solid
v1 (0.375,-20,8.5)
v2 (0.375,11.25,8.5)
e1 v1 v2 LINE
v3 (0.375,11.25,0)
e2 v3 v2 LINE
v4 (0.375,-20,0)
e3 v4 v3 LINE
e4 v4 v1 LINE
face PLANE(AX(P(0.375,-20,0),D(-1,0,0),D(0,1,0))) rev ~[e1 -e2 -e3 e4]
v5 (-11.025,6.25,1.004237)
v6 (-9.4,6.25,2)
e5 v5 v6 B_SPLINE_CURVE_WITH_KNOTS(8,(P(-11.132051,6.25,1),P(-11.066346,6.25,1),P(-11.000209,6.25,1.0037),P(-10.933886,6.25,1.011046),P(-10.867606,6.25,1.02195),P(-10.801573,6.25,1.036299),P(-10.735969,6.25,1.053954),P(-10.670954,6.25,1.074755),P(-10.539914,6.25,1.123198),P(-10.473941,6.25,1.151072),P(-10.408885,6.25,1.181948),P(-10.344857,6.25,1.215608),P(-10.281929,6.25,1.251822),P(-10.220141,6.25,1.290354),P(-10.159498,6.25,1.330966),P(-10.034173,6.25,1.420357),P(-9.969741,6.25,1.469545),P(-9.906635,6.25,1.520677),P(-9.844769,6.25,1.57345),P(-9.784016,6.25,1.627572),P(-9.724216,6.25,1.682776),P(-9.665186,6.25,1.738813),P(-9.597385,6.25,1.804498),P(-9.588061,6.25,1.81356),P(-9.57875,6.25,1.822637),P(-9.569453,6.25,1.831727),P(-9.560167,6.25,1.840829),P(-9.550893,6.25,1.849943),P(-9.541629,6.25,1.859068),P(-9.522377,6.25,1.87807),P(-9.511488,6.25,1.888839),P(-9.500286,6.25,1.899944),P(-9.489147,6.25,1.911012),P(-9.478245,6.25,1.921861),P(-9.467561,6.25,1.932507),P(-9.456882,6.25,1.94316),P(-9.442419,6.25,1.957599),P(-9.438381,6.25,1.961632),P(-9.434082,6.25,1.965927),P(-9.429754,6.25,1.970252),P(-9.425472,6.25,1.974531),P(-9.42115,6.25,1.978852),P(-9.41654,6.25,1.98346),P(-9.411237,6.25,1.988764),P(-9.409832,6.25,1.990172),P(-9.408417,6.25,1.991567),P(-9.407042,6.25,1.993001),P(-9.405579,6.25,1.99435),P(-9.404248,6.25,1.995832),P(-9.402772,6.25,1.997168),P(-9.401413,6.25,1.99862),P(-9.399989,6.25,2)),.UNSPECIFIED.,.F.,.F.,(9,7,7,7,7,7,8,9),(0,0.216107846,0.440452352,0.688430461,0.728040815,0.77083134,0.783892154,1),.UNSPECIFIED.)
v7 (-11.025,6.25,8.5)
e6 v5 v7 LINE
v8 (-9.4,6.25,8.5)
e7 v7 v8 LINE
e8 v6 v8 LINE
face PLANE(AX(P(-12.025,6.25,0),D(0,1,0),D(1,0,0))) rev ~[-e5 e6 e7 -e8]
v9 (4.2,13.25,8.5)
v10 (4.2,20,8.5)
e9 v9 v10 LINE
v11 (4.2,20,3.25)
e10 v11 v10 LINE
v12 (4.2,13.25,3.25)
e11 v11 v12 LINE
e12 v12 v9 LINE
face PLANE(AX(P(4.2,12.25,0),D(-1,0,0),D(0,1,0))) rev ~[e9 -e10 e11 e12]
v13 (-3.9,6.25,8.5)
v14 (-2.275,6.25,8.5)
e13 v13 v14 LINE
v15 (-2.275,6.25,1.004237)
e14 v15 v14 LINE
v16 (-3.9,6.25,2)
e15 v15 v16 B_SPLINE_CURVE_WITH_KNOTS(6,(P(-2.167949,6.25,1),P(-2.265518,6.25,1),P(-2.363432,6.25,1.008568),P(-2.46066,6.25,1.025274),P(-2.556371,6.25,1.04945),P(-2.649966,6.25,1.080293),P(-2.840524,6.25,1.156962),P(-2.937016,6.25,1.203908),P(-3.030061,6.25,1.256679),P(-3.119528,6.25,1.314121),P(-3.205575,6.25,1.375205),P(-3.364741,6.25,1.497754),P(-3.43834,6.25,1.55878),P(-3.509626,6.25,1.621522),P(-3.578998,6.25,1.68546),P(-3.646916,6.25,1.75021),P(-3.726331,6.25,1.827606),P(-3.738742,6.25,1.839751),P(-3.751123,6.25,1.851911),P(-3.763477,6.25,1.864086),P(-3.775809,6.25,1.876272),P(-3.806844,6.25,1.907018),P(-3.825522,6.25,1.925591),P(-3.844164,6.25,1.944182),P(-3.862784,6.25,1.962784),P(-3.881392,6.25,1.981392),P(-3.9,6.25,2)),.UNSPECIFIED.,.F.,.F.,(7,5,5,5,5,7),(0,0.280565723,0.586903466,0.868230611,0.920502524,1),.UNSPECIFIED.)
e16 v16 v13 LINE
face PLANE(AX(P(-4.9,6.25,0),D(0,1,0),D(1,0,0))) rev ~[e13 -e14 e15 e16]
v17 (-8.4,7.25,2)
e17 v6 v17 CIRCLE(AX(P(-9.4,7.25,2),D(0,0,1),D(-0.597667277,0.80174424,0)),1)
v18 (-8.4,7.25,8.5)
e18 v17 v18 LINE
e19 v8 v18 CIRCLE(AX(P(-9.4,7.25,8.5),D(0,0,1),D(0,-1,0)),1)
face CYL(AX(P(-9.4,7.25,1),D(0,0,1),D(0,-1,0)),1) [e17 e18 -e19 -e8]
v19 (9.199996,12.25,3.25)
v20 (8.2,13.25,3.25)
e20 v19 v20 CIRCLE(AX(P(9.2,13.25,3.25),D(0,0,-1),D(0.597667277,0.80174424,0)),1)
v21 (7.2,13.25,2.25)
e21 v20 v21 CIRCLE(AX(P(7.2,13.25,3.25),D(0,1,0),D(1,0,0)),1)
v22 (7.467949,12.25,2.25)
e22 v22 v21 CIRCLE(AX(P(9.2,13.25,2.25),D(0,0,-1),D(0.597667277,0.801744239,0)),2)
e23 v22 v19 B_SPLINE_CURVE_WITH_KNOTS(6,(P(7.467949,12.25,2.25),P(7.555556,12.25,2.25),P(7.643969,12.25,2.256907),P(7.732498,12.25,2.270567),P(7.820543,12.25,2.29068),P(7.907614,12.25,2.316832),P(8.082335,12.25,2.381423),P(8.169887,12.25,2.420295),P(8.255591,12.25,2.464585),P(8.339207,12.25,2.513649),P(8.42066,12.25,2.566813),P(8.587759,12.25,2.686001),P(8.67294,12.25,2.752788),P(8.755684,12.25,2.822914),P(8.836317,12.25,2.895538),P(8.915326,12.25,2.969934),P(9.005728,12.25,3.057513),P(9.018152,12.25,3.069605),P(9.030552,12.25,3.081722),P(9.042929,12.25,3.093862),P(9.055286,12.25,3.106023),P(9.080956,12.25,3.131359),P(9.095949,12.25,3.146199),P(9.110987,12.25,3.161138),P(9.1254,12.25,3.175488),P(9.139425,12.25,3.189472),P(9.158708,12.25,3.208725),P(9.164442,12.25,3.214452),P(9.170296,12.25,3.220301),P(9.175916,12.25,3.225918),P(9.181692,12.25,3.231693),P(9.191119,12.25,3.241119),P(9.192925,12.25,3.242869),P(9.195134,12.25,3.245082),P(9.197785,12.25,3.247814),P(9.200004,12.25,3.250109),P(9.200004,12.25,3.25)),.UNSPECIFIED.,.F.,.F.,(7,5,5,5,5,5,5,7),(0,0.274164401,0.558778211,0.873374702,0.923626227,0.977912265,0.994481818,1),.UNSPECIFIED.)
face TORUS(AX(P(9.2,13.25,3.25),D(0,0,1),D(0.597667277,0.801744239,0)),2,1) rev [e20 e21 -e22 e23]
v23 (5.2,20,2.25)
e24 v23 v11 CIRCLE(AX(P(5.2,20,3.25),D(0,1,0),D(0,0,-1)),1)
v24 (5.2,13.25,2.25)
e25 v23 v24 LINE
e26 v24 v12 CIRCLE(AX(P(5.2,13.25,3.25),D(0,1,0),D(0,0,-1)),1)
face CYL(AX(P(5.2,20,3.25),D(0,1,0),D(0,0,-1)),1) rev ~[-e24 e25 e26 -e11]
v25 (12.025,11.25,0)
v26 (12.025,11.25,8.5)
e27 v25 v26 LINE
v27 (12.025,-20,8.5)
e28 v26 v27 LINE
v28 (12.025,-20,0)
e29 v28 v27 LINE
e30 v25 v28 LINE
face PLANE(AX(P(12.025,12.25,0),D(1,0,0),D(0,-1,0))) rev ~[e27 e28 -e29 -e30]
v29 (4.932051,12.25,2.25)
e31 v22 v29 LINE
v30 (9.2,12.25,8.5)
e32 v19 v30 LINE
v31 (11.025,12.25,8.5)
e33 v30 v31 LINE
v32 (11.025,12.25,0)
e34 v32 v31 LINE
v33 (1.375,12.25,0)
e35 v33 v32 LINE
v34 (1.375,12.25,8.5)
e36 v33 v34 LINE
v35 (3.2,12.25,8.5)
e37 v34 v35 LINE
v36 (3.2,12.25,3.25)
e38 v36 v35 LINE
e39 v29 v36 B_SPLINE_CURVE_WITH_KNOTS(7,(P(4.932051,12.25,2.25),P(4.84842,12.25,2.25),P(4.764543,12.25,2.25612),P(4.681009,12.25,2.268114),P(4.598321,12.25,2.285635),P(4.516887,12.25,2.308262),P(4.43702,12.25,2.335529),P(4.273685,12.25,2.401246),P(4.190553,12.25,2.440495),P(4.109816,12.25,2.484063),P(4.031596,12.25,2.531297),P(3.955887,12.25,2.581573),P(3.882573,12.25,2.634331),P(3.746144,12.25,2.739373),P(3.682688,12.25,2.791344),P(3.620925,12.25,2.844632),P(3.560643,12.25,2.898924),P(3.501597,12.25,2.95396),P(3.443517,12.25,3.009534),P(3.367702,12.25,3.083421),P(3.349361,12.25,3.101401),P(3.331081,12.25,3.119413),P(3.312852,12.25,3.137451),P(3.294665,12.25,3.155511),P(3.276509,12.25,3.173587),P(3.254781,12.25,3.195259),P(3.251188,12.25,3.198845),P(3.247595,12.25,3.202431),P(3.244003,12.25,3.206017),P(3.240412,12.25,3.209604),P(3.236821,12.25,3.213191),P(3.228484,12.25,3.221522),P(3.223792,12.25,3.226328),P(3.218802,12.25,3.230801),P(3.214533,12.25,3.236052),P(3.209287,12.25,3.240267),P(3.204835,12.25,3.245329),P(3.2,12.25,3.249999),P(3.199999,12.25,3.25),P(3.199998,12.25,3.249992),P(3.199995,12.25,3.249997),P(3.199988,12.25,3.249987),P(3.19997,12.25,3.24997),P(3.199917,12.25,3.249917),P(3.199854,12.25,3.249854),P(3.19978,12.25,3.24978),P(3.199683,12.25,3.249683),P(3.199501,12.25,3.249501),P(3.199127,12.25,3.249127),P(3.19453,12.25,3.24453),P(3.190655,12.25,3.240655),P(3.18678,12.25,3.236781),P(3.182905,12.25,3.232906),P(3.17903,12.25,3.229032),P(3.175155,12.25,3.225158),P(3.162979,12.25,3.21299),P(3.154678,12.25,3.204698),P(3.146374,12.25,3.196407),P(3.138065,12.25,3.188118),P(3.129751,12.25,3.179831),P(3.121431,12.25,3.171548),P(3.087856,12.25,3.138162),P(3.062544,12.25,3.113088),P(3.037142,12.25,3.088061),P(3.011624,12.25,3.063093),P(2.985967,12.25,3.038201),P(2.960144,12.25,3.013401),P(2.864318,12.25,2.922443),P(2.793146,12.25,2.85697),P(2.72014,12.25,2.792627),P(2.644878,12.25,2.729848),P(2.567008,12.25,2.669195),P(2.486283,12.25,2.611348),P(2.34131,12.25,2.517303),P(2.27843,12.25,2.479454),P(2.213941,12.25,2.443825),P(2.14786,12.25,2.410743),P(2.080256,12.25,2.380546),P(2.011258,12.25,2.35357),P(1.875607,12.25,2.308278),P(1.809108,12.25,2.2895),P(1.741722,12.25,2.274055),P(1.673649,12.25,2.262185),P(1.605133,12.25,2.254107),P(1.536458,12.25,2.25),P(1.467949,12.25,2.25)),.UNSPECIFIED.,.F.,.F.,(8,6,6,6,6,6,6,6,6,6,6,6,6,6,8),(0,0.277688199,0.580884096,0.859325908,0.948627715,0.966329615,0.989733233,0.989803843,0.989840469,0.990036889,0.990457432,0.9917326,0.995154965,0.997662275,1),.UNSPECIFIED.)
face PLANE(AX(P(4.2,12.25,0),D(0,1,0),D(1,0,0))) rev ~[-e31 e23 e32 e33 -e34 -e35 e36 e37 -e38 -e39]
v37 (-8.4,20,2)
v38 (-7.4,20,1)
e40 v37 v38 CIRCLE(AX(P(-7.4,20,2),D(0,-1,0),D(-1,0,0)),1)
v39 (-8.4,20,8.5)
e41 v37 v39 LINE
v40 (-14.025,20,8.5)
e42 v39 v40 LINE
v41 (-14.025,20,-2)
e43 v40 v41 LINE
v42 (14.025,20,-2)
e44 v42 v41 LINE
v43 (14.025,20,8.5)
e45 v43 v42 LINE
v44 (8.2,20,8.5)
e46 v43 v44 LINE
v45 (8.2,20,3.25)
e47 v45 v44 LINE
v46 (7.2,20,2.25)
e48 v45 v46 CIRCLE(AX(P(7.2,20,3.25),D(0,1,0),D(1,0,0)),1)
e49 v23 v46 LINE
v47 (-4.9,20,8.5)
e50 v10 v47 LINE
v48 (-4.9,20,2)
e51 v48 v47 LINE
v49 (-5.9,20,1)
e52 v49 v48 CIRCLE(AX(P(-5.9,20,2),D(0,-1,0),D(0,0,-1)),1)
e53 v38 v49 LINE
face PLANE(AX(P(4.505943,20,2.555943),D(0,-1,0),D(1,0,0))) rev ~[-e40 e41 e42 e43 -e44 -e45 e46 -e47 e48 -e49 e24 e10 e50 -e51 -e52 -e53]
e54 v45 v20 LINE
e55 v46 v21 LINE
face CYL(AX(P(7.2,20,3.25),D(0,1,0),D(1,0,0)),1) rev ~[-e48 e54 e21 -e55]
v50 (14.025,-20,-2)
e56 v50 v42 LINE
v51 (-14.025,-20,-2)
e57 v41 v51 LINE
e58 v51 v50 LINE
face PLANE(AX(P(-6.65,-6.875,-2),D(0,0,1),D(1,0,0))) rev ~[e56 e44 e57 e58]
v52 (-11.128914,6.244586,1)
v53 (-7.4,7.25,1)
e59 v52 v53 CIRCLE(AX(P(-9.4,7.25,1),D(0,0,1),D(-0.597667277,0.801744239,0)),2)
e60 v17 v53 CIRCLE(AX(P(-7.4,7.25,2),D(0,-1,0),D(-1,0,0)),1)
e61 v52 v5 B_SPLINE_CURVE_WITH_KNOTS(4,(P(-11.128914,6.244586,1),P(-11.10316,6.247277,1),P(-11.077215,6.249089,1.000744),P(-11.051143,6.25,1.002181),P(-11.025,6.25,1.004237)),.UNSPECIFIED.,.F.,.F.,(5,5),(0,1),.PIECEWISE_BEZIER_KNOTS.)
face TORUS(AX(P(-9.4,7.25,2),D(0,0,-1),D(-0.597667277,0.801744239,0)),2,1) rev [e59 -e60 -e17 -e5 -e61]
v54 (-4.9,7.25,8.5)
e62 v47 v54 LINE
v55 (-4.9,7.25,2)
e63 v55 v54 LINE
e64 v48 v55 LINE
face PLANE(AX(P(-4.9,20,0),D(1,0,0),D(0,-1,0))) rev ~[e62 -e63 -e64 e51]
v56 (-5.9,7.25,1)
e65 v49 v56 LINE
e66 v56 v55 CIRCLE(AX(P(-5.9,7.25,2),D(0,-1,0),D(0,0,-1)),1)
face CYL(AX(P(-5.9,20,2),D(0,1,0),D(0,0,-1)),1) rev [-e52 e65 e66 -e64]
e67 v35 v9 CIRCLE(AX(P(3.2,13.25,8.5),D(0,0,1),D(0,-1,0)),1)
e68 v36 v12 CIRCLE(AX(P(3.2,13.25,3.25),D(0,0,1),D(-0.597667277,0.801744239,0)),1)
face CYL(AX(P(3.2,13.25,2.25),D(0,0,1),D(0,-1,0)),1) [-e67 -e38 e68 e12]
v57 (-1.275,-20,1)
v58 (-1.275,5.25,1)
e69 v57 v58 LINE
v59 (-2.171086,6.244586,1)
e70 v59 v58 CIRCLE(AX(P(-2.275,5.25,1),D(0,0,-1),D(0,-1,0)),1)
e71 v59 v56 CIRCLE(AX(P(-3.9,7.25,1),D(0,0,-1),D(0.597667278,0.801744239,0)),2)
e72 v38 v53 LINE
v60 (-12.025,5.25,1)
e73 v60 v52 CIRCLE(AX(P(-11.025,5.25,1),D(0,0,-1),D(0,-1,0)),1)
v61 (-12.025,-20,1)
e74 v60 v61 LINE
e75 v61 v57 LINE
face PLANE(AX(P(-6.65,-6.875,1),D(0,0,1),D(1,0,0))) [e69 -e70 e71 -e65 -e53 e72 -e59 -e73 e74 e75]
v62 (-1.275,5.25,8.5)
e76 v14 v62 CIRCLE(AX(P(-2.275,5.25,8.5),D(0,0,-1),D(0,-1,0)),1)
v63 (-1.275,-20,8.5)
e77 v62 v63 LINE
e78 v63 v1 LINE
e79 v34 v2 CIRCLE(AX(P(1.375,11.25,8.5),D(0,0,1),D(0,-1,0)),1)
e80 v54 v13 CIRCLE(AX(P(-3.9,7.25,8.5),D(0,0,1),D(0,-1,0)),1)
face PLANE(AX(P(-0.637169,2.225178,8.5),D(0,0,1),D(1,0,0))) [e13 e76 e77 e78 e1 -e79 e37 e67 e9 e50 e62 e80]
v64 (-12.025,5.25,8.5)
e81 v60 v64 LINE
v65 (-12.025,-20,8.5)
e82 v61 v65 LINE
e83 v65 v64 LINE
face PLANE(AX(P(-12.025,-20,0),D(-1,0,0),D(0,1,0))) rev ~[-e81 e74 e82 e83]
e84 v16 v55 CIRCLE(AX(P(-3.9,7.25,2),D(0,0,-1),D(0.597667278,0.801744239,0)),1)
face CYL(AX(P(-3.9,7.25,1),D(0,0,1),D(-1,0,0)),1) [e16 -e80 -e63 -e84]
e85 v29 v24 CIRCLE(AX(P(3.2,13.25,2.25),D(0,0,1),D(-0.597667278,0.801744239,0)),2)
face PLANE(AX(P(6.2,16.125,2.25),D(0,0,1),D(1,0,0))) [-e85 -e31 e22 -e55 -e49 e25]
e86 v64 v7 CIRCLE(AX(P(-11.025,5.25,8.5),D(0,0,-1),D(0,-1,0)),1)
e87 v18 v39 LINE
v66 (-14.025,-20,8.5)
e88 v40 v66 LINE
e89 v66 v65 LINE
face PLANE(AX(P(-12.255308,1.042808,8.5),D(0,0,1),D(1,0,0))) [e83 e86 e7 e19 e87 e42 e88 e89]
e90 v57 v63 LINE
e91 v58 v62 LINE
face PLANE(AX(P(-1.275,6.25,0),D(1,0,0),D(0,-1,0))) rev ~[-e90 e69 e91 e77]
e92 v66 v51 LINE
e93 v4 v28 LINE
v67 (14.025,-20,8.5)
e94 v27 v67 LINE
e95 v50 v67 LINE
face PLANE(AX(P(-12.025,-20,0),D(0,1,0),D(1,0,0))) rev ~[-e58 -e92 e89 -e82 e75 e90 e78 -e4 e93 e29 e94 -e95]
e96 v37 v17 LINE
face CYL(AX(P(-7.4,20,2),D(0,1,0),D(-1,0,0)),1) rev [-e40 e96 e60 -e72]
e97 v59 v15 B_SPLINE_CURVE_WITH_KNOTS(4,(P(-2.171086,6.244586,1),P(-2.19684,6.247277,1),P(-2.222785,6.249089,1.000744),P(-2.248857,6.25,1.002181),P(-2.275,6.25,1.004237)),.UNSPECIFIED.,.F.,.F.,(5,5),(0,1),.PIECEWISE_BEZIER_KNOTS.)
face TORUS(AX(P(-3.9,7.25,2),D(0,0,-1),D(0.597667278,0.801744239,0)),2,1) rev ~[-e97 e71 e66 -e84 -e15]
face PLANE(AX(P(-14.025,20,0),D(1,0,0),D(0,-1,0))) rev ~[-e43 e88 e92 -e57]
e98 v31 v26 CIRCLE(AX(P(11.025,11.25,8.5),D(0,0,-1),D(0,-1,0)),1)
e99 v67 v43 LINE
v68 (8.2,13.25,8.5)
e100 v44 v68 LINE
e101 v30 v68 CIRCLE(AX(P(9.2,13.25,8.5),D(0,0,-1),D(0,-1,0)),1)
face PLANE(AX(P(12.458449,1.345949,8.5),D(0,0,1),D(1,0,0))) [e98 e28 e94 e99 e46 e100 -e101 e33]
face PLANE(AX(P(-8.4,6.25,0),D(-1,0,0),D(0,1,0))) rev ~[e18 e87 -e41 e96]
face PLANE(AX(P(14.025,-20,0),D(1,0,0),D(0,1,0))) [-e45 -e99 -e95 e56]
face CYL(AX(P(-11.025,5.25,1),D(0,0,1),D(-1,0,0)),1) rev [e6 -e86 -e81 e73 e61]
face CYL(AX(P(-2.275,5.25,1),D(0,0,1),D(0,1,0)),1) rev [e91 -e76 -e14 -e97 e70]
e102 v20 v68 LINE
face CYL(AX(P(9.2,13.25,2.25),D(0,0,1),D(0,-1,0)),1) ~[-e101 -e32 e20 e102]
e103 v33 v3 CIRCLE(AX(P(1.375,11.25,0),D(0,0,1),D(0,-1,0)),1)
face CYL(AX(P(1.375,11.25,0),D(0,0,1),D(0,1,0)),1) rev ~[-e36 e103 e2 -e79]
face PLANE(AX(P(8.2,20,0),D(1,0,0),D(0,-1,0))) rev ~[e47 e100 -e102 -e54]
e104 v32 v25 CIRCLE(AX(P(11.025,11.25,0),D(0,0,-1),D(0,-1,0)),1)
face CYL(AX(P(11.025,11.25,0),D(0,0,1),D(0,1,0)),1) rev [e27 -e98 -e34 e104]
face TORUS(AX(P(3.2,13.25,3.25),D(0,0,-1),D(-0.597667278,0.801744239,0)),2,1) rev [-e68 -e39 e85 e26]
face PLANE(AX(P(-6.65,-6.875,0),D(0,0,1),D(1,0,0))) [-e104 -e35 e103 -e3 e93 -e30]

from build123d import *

# Parameters (mm, degrees)
F0_W         = 3.5
F0_H         = 13.75
F0_W_2       = 4
F0_H_2       = 7.75
F1_DEPTH     = 2
F2_DEPTH     = 8.5
F3_DEPTH     = 1
F4_DEPTH     = 2.25
F5_R         = 1
F6_T1_DEPTH  = 12.75
F6_T3_DEPTH  = 6.75
F6_T6_ANGLE  = 233.2969892374
F6_T8_ANGLE  = 233.2969892374
F6_T12_ANGLE = 233.2969892374
F6_T17_ANGLE = 233.2969892374


# Not quite as in the source:
# - a fillet or chamfer that OpenCascade refuses, or shapes differently, is made with other operations: its cross-section is extruded or revolved along the edge and cut away or added


with BuildPart() as f1:
    # F0 (on Top) → F1 (new body)
    with BuildSketch(Plane.XY):
        Polygon((-12.025, -20), (-1.275, -20), (-1.275, 6.25), (-4.9, 6.25), (-8.4, 6.25), (-12.025, 6.25), align=None)
        Polygon((-14.025, -20), (-12.025, -20), (-12.025, 6.25), (-8.4, 6.25), (-8.4, 20), (-14.025, 20), align=None)
        Polygon((-1.275, -20), (0.375, -20), (0.375, 12.25), (4.2, 12.25), (4.2, 20), (-4.9, 20), (-4.9, 6.25), (-1.275, 6.25), align=None)
        with Locations((-6.65, 13.125)):
            Rectangle(F0_W, F0_H)
        with Locations((6.2, 16.125)):
            Rectangle(F0_W_2, F0_H_2)
        Polygon((0.375, -20), (12.025, -20), (12.025, 12.25), (8.2, 12.25), (4.2, 12.25), (0.375, 12.25), align=None)
        Polygon((12.025, -20), (14.025, -20), (14.025, 20), (8.2, 20), (8.2, 12.25), (12.025, 12.25), align=None)
    extrude(amount=-F1_DEPTH)

    # F0 (on Top) → F2 (join)
    with BuildSketch(Plane.XY):
        Polygon((-14.025, -20), (-12.025, -20), (-12.025, 6.25), (-8.4, 6.25), (-8.4, 20), (-14.025, 20), align=None)
        Polygon((-1.275, -20), (0.375, -20), (0.375, 12.25), (4.2, 12.25), (4.2, 20), (-4.9, 20), (-4.9, 6.25), (-1.275, 6.25), align=None)
        Polygon((12.025, -20), (14.025, -20), (14.025, 20), (8.2, 20), (8.2, 12.25), (12.025, 12.25), align=None)
    extrude(amount=F2_DEPTH)

    # F0 (on Top) → F3 (join)
    with BuildSketch(Plane.XY):
        Polygon((-12.025, -20), (-1.275, -20), (-1.275, 6.25), (-4.9, 6.25), (-8.4, 6.25), (-12.025, 6.25), align=None)
        with Locations((-6.65, 13.125)):
            Rectangle(F0_W, F0_H)
    extrude(amount=F3_DEPTH)

    # F0 (on Top) → F4 (join)
    with BuildSketch(Plane.XY):
        with Locations((6.2, 16.125)):
            Rectangle(F0_W_2, F0_H_2)
    extrude(amount=F4_DEPTH)

    # F5
    f5_edges = [f1.edges().sort_by_distance(p)[0] for p in [
        (-12.025, 6.25, 4.75),
        (-8.4, 6.25, 4.75),
        (-4.9, 6.25, 4.75),
        (-1.275, 6.25, 4.75),
        (4.2, 12.25, 5.375),
        (8.2, 12.25, 5.375),
        (0.375, 12.25, 4.25),
        (12.025, 12.25, 4.25),
    ]]
    fillet(f5_edges, radius=F5_R)

    # F6: fillet of radius 1 on 8 edges, made by hand

    # F6_s2 → F6_t1 (join)
    with BuildSketch(Plane.XZ.offset(-20)):
        with BuildLine():
            ThreePointArc((-8.4, 2), (-8.1071067812, 1.2928932188), (-7.4, 1))
            Line((-7.4, 1), (-8.4, 1))
            Line((-8.4, 1), (-8.4, 2))
        make_face()
        with BuildLine():
            ThreePointArc((-5.9, 1), (-5.1928932188, 1.2928932188), (-4.9, 2))
            Line((-4.9, 2), (-4.9, 1))
            Line((-4.9, 1), (-5.9, 1))
        make_face()
    extrude(amount=F6_T1_DEPTH)

    # F6_s4 → F6_t3 (join)
    with BuildSketch(Plane.XZ.offset(-20)):
        with BuildLine():
            ThreePointArc((5.2, 2.25), (4.4928932188, 2.5428932188), (4.2, 3.25))
            Line((4.2, 3.25), (4.2, 2.25))
            Line((4.2, 2.25), (5.2, 2.25))
        make_face()
        with BuildLine():
            ThreePointArc((8.2, 3.25), (7.9071067812, 2.5428932188), (7.2, 2.25))
            Line((7.2, 2.25), (8.2, 2.25))
            Line((8.2, 2.25), (8.2, 3.25))
        make_face()
    extrude(amount=F6_T3_DEPTH)

    # F6_s5 → F6_t6 (revolve)
    with BuildSketch(Plane(origin=(-2.5682338051, -1.9145124235, 0), x_dir=(0, 0, 1), z_dir=(0.8017442393, 0.5976672776, 0))):
        with BuildLine():
            ThreePointArc((1, -13.4307181447), (1.2928932188, -12.7236113635), (2, -12.4307181447))
            Line((2, -12.4307181447), (1, -12.4307181447))
            Line((1, -12.4307181447), (1, -13.4307181447))
        make_face()
    revolve(axis=Axis((-9.4, 7.25, 1), (0, 0, 1)), revolution_arc=F6_T6_ANGLE)

    # F6_s7 → F6_t8 (revolve)
    with BuildSketch(Plane(origin=(-5.9809240707, 4.4585323247, 0), x_dir=(0, 0, 1), z_dir=(-0.8017442393, 0.5976672776, 0))):
        with BuildLine():
            ThreePointArc((1, 5.4817433521), (1.2928932188, 4.774636571), (2, 4.4817433521))
            Line((2, 4.4817433521), (1, 4.4817433521))
            Line((1, 4.4817433521), (1, 5.4817433521))
        make_face()
    revolve(axis=Axis((-3.9, 7.25, 1), (0, 0, -1)), revolution_arc=F6_T8_ANGLE)


with BuildPart() as f6_tool10:
    # F6_s11 → F6_t12 (revolve)
    with BuildSketch(Plane(origin=(8.4060261742, 6.2663459654, 0), x_dir=(0, 0, 1), z_dir=(0.8017442393, 0.5976672776, 0))):
        with BuildLine():
            ThreePointArc((2.25, -10.7105758823), (2.5428932188, -10.0034691011), (3.25, -9.7105758823))
            Line((3.25, -9.7105758823), (2.25, -9.7105758823))
            Line((2.25, -9.7105758823), (2.25, -10.7105758823))
        make_face()
    revolve(axis=Axis((3.2, 13.25, 2.25), (0, 0, 1)), revolution_arc=F6_T12_ANGLE)

    split(bisect_by=Plane.XZ.offset(-12.25), keep=Keep.BOTTOM)


with BuildPart() as f1_1:
    add(f1.part)

    # F6_t9: union F6_tool10
    add(f6_tool10.part)


with BuildPart() as f6_tool15:
    # F6_s16 → F6_t17 (revolve)
    with BuildSketch(Plane(origin=(-0.4353827411, 0.3245598844, 0), x_dir=(0, 0, 1), z_dir=(-0.8017442393, 0.5976672776, 0))):
        with BuildLine():
            ThreePointArc((3.25, 17.1216501249), (2.5428932188, 17.4145433437), (2.25, 18.1216501249))
            Line((2.25, 18.1216501249), (2.25, 17.1216501249))
            Line((2.25, 17.1216501249), (3.25, 17.1216501249))
        make_face()
    revolve(axis=Axis((9.2, 13.25, 2.25), (0, 0, -1)), revolution_arc=F6_T17_ANGLE)

    split(bisect_by=Plane.XZ.offset(-12.25), keep=Keep.BOTTOM)


with BuildPart() as f1_2:
    add(f1_1.part)

    # F6_t14: union F6_tool15
    add(f6_tool15.part)


solid = f1_2.part
